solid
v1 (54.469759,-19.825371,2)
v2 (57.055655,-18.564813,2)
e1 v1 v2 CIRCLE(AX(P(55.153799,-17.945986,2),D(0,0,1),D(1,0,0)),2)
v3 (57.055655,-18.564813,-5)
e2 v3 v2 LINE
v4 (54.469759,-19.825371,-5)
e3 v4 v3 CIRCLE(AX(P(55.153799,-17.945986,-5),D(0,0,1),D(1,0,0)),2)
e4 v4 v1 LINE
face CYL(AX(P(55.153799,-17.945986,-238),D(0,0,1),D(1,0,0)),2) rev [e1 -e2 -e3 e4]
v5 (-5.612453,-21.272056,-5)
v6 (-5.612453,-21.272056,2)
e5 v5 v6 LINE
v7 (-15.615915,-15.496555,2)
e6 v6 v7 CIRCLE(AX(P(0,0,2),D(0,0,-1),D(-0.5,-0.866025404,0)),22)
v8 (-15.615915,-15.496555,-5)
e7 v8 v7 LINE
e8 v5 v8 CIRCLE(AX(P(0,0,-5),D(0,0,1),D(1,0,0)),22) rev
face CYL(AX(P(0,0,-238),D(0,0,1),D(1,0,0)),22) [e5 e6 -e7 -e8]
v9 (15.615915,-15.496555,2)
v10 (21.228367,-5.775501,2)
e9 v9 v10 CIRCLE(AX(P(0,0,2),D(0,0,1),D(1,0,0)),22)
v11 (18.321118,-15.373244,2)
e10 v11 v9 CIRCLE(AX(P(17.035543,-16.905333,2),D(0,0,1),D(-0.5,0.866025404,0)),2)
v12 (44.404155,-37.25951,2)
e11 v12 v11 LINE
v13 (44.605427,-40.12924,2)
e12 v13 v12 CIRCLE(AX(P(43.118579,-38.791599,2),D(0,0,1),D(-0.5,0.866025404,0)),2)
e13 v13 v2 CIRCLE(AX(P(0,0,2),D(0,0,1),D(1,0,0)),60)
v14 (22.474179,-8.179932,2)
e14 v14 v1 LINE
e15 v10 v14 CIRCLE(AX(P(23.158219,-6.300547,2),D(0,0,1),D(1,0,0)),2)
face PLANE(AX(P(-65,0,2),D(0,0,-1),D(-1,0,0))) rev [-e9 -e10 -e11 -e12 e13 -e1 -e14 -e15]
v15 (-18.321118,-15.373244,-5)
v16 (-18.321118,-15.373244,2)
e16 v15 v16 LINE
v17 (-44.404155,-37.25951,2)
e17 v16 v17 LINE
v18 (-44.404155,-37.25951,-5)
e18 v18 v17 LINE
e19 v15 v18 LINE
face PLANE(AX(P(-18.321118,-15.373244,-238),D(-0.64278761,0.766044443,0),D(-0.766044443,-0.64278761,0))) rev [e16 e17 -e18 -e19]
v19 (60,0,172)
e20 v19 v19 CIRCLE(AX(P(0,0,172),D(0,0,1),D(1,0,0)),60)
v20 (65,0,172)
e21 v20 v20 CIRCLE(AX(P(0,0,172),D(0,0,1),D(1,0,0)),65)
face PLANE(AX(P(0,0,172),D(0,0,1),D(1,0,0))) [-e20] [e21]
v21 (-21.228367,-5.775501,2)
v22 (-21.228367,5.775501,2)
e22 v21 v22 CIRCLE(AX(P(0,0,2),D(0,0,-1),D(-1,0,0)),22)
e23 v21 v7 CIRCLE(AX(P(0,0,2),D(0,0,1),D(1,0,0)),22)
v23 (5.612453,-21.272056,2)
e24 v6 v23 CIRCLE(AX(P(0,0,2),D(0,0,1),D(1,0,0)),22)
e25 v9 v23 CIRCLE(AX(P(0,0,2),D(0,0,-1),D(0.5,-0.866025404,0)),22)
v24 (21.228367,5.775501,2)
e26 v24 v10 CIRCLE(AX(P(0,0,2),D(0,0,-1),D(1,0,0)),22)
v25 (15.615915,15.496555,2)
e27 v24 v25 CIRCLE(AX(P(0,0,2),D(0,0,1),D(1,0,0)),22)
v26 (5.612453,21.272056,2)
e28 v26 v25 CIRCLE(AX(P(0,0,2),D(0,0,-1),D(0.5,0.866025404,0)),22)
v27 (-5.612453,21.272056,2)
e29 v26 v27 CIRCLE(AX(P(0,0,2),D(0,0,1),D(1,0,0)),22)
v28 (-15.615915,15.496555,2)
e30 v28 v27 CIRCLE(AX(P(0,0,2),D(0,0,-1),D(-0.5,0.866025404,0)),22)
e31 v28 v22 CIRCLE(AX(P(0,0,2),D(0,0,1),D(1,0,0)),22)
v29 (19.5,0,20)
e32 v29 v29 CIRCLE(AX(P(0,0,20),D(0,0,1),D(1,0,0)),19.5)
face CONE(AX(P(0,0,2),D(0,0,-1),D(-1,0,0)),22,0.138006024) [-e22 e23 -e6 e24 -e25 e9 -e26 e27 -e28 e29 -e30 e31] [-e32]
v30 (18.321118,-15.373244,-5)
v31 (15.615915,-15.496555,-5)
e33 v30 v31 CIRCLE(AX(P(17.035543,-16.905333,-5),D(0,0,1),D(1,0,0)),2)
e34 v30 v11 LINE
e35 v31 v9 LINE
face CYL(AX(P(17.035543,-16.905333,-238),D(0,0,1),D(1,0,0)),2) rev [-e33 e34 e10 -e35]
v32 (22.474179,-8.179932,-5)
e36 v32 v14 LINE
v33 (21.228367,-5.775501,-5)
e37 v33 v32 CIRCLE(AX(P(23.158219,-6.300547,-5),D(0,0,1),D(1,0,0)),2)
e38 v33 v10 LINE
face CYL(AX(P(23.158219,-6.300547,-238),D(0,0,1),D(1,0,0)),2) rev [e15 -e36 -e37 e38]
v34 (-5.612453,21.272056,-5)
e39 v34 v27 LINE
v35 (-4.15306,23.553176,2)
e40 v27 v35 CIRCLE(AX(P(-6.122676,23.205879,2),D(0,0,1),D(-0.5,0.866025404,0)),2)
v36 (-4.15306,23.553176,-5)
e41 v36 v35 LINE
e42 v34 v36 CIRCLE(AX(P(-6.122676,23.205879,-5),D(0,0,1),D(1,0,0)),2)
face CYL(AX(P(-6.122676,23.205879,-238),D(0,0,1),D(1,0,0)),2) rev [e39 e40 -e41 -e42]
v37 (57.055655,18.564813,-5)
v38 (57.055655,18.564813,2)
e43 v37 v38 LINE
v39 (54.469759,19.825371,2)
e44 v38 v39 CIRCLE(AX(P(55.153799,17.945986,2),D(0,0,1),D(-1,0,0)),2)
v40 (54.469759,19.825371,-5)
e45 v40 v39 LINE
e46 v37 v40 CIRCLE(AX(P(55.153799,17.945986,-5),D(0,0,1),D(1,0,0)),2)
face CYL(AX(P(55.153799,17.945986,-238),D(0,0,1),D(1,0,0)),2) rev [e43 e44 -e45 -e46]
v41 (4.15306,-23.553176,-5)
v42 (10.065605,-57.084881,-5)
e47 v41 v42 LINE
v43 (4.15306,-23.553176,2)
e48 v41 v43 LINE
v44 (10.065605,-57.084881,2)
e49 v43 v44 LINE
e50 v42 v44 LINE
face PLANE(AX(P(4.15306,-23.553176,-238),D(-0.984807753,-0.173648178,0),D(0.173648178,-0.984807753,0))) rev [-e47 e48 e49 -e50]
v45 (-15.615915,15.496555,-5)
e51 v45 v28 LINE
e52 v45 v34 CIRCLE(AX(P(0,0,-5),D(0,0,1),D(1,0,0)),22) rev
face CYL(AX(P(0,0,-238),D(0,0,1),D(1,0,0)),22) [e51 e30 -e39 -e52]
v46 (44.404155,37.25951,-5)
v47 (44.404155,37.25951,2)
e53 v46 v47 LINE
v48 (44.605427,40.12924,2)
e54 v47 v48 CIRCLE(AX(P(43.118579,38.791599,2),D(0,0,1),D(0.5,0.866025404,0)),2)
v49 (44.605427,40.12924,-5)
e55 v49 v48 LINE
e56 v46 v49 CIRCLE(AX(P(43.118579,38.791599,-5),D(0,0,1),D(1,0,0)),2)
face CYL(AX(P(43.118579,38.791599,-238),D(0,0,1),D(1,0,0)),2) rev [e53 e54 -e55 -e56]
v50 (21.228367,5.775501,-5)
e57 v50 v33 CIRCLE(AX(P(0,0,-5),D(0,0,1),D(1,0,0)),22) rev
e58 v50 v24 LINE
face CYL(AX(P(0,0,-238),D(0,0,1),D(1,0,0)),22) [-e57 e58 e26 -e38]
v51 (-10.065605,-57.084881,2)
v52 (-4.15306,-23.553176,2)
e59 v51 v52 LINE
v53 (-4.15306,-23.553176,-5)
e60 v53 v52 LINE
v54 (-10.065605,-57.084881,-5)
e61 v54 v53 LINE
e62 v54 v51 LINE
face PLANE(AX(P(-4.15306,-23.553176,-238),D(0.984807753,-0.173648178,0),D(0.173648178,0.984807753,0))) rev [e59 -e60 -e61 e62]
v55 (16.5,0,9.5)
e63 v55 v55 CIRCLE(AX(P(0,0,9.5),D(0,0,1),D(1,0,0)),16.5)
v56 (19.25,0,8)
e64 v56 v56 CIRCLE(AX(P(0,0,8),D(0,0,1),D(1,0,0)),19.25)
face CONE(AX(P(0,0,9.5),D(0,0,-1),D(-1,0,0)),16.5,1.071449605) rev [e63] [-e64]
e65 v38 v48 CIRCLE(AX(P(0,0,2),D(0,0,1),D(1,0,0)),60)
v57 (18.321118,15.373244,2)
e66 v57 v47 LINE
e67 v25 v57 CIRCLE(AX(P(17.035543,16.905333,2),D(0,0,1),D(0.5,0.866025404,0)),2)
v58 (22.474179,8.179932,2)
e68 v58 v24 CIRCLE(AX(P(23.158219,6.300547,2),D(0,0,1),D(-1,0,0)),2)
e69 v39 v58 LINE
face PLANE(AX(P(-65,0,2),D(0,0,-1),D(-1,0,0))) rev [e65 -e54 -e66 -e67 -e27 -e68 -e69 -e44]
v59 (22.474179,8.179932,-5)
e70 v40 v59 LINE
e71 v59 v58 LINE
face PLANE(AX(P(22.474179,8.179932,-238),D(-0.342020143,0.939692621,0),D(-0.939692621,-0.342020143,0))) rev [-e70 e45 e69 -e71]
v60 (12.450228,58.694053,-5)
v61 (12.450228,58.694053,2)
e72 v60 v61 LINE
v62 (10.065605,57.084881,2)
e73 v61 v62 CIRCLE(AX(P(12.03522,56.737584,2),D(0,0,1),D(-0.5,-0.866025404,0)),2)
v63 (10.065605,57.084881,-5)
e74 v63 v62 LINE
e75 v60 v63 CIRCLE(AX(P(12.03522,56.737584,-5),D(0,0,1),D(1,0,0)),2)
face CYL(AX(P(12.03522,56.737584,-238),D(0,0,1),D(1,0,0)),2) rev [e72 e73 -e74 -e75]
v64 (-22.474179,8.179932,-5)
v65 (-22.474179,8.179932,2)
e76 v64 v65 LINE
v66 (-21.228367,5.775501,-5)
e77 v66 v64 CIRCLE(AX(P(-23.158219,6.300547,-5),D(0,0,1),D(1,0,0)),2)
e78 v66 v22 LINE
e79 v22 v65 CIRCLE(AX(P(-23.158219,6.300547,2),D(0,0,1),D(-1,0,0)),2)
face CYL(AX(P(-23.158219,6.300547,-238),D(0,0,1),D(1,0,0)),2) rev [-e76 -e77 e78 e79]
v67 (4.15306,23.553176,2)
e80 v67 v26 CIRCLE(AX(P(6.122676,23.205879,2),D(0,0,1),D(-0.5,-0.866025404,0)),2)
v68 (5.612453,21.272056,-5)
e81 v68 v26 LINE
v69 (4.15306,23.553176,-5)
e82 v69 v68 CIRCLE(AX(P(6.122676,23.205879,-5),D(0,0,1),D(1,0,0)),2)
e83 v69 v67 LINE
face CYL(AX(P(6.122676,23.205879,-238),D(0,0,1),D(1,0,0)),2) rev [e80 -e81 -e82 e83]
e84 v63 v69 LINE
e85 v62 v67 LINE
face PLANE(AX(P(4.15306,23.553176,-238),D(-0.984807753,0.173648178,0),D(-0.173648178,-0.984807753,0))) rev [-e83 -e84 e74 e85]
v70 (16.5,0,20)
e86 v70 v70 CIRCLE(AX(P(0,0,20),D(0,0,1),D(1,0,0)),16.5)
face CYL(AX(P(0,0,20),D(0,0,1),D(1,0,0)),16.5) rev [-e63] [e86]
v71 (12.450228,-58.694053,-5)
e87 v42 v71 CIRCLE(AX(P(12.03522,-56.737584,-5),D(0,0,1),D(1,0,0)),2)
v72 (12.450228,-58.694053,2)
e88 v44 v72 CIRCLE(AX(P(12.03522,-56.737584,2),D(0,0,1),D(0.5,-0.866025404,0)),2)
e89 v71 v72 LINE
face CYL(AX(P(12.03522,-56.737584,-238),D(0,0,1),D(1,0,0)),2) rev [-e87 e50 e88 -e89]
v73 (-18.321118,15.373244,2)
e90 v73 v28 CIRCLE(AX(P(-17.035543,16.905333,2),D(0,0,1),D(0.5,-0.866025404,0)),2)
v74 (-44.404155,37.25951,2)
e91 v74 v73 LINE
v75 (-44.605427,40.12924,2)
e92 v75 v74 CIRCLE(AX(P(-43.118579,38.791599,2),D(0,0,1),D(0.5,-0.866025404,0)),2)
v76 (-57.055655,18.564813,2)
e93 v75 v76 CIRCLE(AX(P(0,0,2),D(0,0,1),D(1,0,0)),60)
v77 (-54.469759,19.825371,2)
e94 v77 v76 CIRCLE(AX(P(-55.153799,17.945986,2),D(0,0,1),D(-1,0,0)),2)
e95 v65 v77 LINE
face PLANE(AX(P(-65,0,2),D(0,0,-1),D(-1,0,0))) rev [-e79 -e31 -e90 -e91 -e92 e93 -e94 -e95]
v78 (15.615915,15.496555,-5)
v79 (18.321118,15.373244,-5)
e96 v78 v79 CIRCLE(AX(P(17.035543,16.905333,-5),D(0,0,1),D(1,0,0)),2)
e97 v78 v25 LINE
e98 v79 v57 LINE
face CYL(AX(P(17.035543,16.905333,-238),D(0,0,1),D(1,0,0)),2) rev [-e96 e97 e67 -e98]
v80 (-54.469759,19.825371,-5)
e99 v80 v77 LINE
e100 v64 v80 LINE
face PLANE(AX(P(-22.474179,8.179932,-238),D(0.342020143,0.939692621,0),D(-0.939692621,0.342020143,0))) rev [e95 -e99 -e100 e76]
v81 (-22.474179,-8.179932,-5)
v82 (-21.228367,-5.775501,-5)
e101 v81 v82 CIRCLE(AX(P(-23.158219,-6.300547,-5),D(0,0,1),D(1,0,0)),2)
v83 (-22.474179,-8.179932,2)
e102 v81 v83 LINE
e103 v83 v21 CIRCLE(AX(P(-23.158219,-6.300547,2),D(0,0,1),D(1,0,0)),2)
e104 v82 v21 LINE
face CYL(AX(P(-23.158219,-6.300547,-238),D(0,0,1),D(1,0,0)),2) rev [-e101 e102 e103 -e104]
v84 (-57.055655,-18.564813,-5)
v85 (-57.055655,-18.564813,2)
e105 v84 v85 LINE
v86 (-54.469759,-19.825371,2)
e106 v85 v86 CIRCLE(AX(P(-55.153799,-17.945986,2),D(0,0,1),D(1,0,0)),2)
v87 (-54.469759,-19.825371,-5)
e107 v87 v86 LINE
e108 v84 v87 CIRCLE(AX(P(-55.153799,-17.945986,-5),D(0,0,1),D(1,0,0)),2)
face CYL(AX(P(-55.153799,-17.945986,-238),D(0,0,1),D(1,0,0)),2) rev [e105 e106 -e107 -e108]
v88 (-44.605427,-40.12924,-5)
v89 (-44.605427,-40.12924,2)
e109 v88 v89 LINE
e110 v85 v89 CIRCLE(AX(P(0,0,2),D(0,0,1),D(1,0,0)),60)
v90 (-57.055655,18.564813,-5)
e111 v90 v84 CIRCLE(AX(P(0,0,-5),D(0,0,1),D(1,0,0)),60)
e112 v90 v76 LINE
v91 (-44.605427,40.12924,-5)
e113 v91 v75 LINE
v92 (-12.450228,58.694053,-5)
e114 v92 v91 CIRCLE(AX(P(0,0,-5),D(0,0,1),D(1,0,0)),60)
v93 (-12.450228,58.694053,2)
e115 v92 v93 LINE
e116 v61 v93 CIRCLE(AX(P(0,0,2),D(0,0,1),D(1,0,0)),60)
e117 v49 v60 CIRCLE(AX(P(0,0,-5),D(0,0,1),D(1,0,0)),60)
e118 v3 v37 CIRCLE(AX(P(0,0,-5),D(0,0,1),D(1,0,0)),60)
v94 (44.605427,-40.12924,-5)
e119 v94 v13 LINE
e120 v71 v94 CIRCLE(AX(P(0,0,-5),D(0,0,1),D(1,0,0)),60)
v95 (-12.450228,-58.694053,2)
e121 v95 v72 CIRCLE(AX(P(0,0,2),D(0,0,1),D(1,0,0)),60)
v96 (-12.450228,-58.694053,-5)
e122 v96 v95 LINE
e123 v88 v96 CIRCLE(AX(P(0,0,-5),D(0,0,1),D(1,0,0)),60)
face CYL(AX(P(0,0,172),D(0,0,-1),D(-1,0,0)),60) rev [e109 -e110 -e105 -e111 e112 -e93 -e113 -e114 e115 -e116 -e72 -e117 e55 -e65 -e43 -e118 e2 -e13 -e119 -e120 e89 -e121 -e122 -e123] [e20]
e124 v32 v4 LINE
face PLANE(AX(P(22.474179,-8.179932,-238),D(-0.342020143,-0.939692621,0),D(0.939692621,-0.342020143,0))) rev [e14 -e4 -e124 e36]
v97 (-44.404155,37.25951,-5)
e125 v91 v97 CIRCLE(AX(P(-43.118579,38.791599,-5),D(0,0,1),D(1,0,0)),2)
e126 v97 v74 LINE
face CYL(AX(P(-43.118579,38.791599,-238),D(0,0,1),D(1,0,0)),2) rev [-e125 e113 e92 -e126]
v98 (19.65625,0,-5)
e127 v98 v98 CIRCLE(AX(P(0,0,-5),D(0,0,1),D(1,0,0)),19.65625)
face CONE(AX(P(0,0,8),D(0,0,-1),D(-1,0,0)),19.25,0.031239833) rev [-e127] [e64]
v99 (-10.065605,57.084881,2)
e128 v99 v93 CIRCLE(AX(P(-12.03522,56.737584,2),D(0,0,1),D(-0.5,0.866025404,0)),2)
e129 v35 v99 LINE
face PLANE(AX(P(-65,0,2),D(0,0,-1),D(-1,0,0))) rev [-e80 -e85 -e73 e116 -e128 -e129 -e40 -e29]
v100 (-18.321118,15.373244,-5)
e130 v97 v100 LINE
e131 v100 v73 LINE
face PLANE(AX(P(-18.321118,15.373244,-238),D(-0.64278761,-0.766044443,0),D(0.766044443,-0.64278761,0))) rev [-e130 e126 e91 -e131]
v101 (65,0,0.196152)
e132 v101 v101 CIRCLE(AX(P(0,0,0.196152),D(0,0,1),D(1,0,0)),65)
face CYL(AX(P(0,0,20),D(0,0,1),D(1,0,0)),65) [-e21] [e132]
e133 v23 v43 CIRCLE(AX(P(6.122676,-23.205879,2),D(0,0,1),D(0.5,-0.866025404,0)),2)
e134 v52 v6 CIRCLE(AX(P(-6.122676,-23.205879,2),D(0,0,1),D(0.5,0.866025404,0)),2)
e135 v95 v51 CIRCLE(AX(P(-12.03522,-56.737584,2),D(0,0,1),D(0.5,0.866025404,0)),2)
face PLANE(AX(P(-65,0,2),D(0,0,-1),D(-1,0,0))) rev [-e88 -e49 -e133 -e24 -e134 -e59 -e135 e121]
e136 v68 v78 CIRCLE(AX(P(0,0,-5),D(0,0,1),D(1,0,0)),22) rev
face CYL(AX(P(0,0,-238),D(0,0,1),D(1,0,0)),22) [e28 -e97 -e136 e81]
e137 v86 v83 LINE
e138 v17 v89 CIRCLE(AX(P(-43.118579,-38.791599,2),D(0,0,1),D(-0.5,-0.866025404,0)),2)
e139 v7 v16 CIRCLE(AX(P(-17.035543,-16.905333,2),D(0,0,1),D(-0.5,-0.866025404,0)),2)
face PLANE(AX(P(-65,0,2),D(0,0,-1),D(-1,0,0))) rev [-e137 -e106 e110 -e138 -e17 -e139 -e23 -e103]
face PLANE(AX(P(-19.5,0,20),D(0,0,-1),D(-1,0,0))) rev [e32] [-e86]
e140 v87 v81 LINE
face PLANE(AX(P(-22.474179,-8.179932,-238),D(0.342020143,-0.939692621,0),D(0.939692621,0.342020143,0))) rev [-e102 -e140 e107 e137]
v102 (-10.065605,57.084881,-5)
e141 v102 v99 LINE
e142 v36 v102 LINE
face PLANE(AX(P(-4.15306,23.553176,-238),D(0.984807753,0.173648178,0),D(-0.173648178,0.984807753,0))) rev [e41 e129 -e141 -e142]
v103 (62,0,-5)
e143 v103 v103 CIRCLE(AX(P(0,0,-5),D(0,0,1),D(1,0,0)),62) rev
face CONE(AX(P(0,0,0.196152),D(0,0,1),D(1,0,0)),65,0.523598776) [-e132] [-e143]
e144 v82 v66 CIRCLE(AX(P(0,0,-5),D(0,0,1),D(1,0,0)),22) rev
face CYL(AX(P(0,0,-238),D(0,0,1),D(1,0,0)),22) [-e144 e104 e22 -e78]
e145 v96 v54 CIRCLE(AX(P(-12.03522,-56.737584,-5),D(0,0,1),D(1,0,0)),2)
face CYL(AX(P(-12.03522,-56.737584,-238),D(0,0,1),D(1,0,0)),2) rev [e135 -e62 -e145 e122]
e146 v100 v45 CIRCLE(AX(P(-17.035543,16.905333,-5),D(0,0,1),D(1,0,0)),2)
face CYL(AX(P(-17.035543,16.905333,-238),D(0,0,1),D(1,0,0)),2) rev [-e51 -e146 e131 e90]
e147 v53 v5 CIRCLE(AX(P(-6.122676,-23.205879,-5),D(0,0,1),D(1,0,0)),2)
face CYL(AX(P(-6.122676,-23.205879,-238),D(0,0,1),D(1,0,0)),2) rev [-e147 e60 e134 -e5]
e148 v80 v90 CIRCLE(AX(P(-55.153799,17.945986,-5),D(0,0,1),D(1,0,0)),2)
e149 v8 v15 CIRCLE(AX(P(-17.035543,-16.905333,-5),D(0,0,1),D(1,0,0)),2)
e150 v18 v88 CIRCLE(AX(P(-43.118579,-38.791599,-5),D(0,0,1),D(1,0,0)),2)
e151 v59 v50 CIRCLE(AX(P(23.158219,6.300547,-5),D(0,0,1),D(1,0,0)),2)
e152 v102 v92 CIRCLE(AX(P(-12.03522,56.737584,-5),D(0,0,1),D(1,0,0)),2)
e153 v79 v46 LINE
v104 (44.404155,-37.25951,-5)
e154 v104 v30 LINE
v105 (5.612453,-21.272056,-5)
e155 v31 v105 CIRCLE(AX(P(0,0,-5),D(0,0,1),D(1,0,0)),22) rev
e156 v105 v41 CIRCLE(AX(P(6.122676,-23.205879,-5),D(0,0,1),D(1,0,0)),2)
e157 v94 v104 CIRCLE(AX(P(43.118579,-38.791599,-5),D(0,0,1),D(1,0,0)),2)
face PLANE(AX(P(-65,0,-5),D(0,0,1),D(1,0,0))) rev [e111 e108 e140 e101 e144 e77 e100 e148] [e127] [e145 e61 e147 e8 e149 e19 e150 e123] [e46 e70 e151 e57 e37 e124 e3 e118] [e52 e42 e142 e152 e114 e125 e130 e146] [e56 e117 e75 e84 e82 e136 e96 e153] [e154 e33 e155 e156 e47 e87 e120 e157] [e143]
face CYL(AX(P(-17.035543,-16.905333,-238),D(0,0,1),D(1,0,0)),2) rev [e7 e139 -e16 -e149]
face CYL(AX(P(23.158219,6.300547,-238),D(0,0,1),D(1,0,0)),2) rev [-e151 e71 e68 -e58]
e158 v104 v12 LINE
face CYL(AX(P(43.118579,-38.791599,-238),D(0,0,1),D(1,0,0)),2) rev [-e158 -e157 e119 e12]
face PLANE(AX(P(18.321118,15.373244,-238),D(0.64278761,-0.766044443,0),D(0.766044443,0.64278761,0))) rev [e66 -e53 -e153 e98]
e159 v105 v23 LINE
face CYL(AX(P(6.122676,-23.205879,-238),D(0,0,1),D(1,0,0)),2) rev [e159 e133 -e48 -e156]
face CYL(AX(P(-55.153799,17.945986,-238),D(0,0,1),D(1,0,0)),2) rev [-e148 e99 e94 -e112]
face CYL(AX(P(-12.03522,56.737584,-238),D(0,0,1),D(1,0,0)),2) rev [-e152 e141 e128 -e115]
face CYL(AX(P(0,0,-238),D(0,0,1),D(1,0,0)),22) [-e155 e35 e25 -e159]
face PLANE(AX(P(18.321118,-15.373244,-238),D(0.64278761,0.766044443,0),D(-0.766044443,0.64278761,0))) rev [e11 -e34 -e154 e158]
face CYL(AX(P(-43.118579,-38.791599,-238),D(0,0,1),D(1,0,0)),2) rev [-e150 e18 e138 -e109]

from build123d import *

# Parameters (mm, degrees)
RING_1MM_R          = 65
RING_1MM_R_2        = 60
BOSS_EXTRUDE1_DEPTH = 170
CUT_EXTRUDE2_START  = -240
CUT_EXTRUDE2_DEPTH  = 240
CIRPATTERN1_COUNT   = 6
CHAMFER1_SIZE       = 3
CHAMFER1_SIZE2      = 5.196152423


with BuildPart() as part:
    # Sketch1 → Revolve1 (revolve)
    with BuildSketch(Plane(origin=(0, 0, 0), x_dir=(-1, 0, 0), z_dir=(0, 1, 0))):
        Polygon((19.25, 8), (16.5, 9.5), (16.5, 20), (19.5, 20), (22, 2), (65, 2), (65, 0), (65, -5), (19.65625, -5), align=None)
    revolve(axis=Axis((0, 0, 20), (0, 0, -1)))

    # ring-1mm → Boss-Extrude1 (add)
    with BuildSketch(Plane.XY.offset(2)):
        Circle(RING_1MM_R)
        Circle(RING_1MM_R_2, mode=Mode.SUBTRACT)
    extrude(amount=BOSS_EXTRUDE1_DEPTH)

    # Sketch3-base-openings → Cut-Extrude2 (cut)
    with BuildSketch(Plane.XY.offset(2).offset(CUT_EXTRUDE2_START)):
        with BuildLine():
            Line((22.474178755, 8.179932107), (54.469759174, 19.825371007))
            ThreePointArc((54.469759174, 19.825371007), (56.030166948, 19.743756615), (57.055654614, 18.564812861))
            ThreePointArc((57.055654614, 18.564812861), (60, 0), (57.055654614, -18.564812861))
            ThreePointArc((57.055654614, -18.564812861), (56.030166948, -19.743756615), (54.469759174, -19.825371007))
            Line((54.469759174, -19.825371007), (22.474178755, -8.179932107))
            ThreePointArc((22.474178755, -8.179932107), (21.382429199, -7.220639488), (21.228367455, -5.775501293))
            ThreePointArc((21.228367455, -5.775501293), (22, 0), (21.228367455, 5.775501293))
            ThreePointArc((21.228367455, 5.775501293), (21.382429199, 7.220639488), (22.474178755, 8.179932107))
        make_face()
    cut_extrude2 = extrude(amount=CUT_EXTRUDE2_DEPTH, mode=Mode.SUBTRACT)

    # CirPattern1: Cut-Extrude2 ×6 about axis
    cirpattern1_axis = Axis((0, 0, 2), (0, 0, 1))
    for i in range(1, CIRPATTERN1_COUNT):
        add(cut_extrude2.rotate(cirpattern1_axis, i * 360 / CIRPATTERN1_COUNT), mode=Mode.SUBTRACT)

    # Chamfer1
    chamfer1_edges = [part.edges().sort_by_distance(p)[0] for p in [
        (65, 0, -5),
    ]]
    chamfer1_side = [part.faces().sort_by_distance(p)[0] for p in [
        (63.161522369, 0, -5),
    ]]
    chamfer(chamfer1_edges, length=CHAMFER1_SIZE, length2=CHAMFER1_SIZE2, reference=chamfer1_side[0])


solid = part.part
